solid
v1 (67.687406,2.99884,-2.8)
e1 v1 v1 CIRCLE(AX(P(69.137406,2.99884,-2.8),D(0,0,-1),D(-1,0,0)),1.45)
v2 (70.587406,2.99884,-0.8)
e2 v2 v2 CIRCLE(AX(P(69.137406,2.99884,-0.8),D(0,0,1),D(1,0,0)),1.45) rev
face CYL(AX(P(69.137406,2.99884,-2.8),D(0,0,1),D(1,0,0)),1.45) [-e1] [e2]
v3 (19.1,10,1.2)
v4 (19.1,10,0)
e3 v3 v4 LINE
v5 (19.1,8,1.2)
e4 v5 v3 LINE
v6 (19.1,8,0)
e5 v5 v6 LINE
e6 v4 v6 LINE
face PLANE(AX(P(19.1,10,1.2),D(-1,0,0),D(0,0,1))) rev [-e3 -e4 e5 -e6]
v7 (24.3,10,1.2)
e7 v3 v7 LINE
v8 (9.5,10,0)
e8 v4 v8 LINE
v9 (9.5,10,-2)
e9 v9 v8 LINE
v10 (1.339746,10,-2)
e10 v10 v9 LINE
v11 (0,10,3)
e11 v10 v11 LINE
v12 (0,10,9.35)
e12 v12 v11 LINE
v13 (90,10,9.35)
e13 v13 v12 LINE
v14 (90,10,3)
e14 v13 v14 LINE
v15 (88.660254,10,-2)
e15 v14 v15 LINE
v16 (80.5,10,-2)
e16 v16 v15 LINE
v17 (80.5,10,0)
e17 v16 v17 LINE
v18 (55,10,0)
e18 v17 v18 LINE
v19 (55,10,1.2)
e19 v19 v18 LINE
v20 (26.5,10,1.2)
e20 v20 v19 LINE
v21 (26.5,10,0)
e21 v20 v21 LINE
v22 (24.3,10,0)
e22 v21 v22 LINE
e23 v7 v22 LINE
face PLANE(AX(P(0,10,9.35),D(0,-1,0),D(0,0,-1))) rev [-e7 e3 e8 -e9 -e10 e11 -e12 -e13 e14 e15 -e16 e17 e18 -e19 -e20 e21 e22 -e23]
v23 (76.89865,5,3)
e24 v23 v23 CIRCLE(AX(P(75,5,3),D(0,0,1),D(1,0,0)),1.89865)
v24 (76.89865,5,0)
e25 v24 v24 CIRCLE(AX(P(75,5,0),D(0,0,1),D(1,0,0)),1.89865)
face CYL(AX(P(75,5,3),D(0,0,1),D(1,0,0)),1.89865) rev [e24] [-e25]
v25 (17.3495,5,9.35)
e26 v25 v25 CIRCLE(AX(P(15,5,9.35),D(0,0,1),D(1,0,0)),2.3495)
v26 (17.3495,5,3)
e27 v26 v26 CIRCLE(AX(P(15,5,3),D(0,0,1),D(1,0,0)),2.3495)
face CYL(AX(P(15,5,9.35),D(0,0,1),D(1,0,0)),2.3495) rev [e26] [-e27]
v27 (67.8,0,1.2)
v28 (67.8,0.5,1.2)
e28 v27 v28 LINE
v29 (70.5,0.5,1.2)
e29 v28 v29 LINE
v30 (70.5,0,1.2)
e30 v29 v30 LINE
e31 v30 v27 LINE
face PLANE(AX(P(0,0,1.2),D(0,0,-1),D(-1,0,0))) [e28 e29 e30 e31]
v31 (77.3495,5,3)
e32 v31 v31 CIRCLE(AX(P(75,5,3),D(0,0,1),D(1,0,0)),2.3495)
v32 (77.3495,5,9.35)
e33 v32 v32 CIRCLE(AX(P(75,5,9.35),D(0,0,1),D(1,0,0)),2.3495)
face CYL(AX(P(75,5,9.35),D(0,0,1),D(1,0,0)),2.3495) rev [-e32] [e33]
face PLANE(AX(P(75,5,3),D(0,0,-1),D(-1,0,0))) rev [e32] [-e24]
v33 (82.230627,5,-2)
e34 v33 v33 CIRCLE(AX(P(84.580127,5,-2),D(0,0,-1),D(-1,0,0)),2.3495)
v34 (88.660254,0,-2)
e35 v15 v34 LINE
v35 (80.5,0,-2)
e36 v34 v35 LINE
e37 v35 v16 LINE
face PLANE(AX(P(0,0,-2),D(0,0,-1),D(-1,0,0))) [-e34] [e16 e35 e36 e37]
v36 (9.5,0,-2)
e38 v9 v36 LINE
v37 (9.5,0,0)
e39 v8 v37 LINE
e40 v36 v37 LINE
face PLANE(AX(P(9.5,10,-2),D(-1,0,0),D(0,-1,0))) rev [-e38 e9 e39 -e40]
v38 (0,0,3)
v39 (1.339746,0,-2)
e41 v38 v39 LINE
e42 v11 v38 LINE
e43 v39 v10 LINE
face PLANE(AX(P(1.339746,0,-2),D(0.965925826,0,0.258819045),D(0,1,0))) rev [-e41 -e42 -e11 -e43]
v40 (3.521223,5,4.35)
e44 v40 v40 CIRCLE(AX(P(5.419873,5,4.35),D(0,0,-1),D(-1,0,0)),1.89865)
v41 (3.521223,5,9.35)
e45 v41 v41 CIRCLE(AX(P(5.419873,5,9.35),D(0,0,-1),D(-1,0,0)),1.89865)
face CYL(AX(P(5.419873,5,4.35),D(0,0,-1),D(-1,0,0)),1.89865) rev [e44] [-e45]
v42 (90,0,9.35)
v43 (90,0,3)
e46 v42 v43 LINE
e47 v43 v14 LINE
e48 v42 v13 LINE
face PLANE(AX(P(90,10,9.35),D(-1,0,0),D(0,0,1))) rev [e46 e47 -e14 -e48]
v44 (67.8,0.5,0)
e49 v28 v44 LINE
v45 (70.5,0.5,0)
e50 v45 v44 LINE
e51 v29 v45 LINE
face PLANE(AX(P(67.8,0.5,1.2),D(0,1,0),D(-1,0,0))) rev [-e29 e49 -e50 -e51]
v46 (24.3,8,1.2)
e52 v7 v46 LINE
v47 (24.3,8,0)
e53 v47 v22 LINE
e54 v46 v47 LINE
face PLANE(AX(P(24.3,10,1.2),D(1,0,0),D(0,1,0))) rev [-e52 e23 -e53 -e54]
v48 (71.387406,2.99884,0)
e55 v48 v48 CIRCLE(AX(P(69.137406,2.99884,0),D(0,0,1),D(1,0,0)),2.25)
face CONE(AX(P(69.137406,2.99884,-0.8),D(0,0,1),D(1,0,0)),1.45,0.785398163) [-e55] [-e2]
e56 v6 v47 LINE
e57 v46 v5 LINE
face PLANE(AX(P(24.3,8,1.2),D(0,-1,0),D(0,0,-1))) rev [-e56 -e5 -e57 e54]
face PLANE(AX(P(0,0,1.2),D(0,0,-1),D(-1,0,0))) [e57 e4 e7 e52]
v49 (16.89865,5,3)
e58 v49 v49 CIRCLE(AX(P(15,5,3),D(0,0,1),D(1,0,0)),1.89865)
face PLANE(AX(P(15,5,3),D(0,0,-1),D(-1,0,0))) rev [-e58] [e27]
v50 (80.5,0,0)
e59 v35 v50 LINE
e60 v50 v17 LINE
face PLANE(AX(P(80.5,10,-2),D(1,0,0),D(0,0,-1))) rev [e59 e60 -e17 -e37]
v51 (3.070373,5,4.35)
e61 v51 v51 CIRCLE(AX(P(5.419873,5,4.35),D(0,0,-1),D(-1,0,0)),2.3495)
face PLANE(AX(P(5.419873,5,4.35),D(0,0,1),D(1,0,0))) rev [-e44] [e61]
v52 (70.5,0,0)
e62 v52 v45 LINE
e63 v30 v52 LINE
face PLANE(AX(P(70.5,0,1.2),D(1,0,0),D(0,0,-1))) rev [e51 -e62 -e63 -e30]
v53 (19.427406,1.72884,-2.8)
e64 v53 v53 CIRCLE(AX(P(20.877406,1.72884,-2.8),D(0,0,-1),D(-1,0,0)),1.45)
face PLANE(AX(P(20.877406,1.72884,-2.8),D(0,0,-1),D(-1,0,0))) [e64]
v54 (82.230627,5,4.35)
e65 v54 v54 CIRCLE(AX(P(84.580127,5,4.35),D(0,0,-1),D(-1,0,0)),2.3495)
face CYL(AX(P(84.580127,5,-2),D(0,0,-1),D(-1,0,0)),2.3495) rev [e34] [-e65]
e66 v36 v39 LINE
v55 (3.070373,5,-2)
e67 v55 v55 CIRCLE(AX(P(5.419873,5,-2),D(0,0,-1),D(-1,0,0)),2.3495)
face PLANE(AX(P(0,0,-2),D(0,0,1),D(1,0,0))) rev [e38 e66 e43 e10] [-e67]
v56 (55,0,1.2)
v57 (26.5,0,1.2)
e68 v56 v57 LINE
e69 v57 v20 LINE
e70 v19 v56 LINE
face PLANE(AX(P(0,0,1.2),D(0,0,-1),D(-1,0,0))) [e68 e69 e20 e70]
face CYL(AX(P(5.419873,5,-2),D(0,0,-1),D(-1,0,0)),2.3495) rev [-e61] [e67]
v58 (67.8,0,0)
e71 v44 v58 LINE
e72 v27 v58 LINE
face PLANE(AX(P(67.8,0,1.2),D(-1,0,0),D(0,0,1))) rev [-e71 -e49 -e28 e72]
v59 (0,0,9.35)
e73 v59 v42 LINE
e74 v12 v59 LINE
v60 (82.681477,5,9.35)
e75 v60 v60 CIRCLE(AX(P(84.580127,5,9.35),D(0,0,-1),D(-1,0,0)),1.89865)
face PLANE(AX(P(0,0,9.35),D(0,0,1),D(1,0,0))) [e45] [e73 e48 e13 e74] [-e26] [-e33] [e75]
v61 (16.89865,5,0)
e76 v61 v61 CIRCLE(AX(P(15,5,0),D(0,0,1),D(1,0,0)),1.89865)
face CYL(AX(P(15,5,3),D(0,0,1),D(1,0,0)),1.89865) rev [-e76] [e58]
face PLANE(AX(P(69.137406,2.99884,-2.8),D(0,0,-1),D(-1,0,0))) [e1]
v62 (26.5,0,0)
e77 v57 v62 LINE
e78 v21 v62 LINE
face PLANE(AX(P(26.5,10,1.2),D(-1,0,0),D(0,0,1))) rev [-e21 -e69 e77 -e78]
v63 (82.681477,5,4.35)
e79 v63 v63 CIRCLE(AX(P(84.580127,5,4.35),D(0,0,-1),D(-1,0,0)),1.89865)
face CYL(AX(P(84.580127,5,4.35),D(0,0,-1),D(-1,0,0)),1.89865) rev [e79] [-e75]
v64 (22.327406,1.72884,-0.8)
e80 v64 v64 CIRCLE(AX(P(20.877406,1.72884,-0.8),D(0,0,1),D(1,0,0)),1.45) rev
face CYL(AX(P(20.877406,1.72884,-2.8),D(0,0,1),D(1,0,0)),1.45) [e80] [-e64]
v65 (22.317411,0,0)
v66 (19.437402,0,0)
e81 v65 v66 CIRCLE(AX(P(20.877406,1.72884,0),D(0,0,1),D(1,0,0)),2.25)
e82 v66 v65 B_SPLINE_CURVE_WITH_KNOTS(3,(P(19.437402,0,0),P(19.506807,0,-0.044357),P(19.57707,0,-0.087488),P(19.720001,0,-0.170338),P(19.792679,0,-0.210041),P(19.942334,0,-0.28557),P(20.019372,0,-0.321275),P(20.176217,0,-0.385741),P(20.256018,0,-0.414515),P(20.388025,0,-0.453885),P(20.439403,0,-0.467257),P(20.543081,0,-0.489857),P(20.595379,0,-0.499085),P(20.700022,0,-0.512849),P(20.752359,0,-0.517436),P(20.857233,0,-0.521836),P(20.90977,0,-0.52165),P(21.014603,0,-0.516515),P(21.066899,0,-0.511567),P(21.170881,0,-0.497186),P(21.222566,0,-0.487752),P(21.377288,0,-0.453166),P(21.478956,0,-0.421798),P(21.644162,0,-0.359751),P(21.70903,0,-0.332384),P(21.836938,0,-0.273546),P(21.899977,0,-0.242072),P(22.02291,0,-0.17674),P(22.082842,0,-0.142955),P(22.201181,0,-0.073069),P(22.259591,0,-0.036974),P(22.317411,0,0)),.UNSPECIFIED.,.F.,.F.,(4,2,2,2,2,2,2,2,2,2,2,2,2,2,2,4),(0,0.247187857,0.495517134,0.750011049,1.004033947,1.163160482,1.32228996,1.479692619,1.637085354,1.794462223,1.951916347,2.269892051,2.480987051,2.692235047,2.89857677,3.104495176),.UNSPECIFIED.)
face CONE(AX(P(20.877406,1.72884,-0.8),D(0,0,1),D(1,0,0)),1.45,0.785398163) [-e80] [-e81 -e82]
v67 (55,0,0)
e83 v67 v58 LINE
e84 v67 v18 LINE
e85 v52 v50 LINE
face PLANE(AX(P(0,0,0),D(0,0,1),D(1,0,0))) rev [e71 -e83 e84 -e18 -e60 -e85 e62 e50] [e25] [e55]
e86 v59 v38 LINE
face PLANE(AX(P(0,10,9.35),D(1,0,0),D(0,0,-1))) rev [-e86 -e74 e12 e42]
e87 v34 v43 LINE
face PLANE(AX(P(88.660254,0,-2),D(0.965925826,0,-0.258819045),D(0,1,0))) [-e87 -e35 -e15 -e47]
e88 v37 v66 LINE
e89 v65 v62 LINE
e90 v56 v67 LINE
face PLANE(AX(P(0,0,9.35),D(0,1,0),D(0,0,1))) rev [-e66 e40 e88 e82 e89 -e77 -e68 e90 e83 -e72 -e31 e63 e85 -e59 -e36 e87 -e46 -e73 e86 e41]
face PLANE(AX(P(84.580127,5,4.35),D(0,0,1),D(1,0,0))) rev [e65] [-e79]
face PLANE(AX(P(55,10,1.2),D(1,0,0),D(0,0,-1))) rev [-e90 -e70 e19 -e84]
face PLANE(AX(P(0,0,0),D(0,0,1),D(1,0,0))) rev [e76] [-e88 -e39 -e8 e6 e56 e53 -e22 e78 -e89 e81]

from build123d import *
from OCP.BRepFilletAPI import BRepFilletAPI_MakeChamfer

# Parameters (mm, degrees)
SKETCH2_W                       = 90
SKETCH2_H                       = 10
BOSS_EXTRUDE1_DEPTH             = 9.35
SKETCH4_W                       = 9.5
SKETCH4_H                       = 10
BOSS_EXTRUDE2_DEPTH             = 2
SKETCH5_R                       = 1.45
BOSS_EXTRUDE3_DEPTH             = 2.8
CHAMFER1_SIZE                   = 0.8
CHAMFER2_SIZE                   = 5
CHAMFER2_SIZE2                  = 1.339745962
F_13_0_185_DIAMETER_HOLE1_D     = 4.699
F_13_0_185_DIAMETER_HOLE1_DEPTH = 6.35
F_6_CLEARANCE_HOLE1_D           = 3.7973
F_6_CLEARANCE_HOLE1_ON_FACE_2_D = 3.7973
F_13_0_185_DIAMETER_HOLE2_D     = 4.699
F_13_0_185_DIAMETER_HOLE2_DEPTH = 6.35
F_6_CLEARANCE_HOLE2_D           = 3.7973
CUT_EXTRUDE1_DEPTH              = 92.035281622
CUT_EXTRUDE1_DEPTH_BACK         = 1.2
SKETCH12_W                      = 28.5
SKETCH12_H                      = 10
SKETCH12_W_2                    = 5.2
SKETCH12_H_2                    = 2
SKETCH12_W_3                    = 2.7
SKETCH12_H_3                    = 0.5


with BuildPart() as part:
    # Sketch2 → Boss-Extrude1 (new body)
    with BuildSketch(Plane.XY):
        with Locations((45, 5)):
            Rectangle(SKETCH2_W, SKETCH2_H)
    extrude(amount=BOSS_EXTRUDE1_DEPTH)

    # Sketch4 → Boss-Extrude2 (add)
    with BuildSketch(Plane(origin=(0, 0, 0), x_dir=(-1, 0, 0), z_dir=(0, 0, -1))):
        with Locations((-4.75, 5)):
            Rectangle(SKETCH4_W, SKETCH4_H)
        with Locations((-85.25, 5)):
            Rectangle(SKETCH4_W, SKETCH4_H)
    extrude(amount=BOSS_EXTRUDE2_DEPTH)

    # Sketch5 → Boss-Extrude3 (add)
    with BuildSketch(Plane(origin=(0, 0, 0), x_dir=(-1, 0, 0), z_dir=(0, 0, -1))):
        with Locations(Location((-69.137406388, 2.998839673, 0), (0, 0, 180))):
            Circle(SKETCH5_R)
        with Locations(Location((-20.877406388, 1.728839673, 0), (0, 0, 180))):
            Circle(SKETCH5_R)
    extrude(amount=BOSS_EXTRUDE3_DEPTH)

    # Chamfer1
    # the kernel refuses this chamfer: 0.8 mm, written as the material it adds along each edge
    with BuildSketch(Plane(origin=(69.137406388, 2.998839673, 0), x_dir=(1, 0, 0), z_dir=(0, 1, 0))) as chamfer1_piece_1:
        Polygon((1.45 + CHAMFER1_SIZE, 0), (1.45, CHAMFER1_SIZE), (1.45, 0), align=None)
    revolve(axis=Axis((69.137406388, 2.998839673, 0), (0, 0, -1)))
    with BuildSketch(Plane(origin=(20.877406388, 1.728839673, 0), x_dir=(1, 0, 0), z_dir=(0, 1, 0))) as chamfer1_piece_2_section:
        Polygon((1.45 + CHAMFER1_SIZE, 0), (1.45, CHAMFER1_SIZE), (1.45, 0), align=None)
    chamfer1_piece_2 = revolve(axis=Axis((20.877406388, 1.728839673, 0), (0, 0, -1)), mode=Mode.PRIVATE)
    chamfer1_piece_2 = split(chamfer1_piece_2, bisect_by=Plane(origin=(19.038199604, 0, -0.389206784), z_dir=(0, 1, 0)), keep=Keep.TOP, mode=Mode.PRIVATE)
    add(chamfer1_piece_2)

    # Chamfer2: one chamfer whose edges measure the first distance from different faces: ONE call of the kernel's chamfer builder (chamfer() names one face for all edges)
    chamfer2_edges_1 = [part.edges().sort_by_distance(p)[0] for p in [
        (0, 5, -2),
    ]]
    chamfer2_side_1 = [part.faces().sort_by_distance(p)[0] for p in [
        (0, 5, 3.675),
    ]]
    chamfer2_edges_2 = [part.edges().sort_by_distance(p)[0] for p in [
        (90, 5, -2),
    ]]
    chamfer2_side_2 = [part.faces().sort_by_distance(p)[0] for p in [
        (90, 5, 3.675),
    ]]
    chamfer2 = BRepFilletAPI_MakeChamfer(part.part.solid().wrapped)
    for e in chamfer2_edges_1:
        chamfer2.Add(CHAMFER2_SIZE, CHAMFER2_SIZE2, e.wrapped, chamfer2_side_1[0].wrapped)  # the first distance lies on this face
    for e in chamfer2_edges_2:
        chamfer2.Add(CHAMFER2_SIZE, CHAMFER2_SIZE2, e.wrapped, chamfer2_side_2[0].wrapped)  # the first distance lies on this face
    add(Compound.cast(chamfer2.Shape()), mode=Mode.REPLACE)

    # #13 (0.185) Diameter Hole1
    with Locations(Plane(origin=(84.580127019, 5, -2), x_dir=(-1, 0, 0), z_dir=(0, 0, -1))):
        with Locations((0, 0), (79.160254038, 0)):
            Hole(F_13_0_185_DIAMETER_HOLE1_D / 2, depth=F_13_0_185_DIAMETER_HOLE1_DEPTH)

    # #6 Clearance Hole1 (through all)
    with Locations(Plane(origin=(84.580127019, 5, 4.35), x_dir=(-1, 0, 0), z_dir=(0, 0, -1))):
        with Locations((0, 0), (79.160254038, 0)):
            Hole(F_6_CLEARANCE_HOLE1_D / 2)

    # #6 Clearance Hole1 on face 2 (through all)
    with Locations(Plane(origin=(5.419872981, 5, 0), x_dir=(-1, 0, 0), z_dir=(0, 0, -1))):
        with Locations((0, 0)):
            Hole(F_6_CLEARANCE_HOLE1_ON_FACE_2_D / 2)

    # #13 (0.185) Diameter Hole2
    with Locations(Plane(origin=(75, 5, 9.35), x_dir=(1, 0, 0), z_dir=(0, 0, 1))):
        with Locations((0, 0), (-60, 0)):
            Hole(F_13_0_185_DIAMETER_HOLE2_D / 2, depth=F_13_0_185_DIAMETER_HOLE2_DEPTH)

    # #6 Clearance Hole2 (through all)
    with Locations(Plane(origin=(75, 5, 3), x_dir=(1, 0, 0), z_dir=(0, 0, 1))):
        with Locations((0, 0), (-60, 0)):
            Hole(F_6_CLEARANCE_HOLE2_D / 2)

    # Sketch12 → Cut-Extrude1 (cut, two sides: drawn at the far end of the back side and taken through both)
    with BuildSketch(Plane(origin=(0, 0, 0), x_dir=(-1, 0, 0), z_dir=(0, 0, -1)).offset(-CUT_EXTRUDE1_DEPTH_BACK)):
        with Locations((-40.75, 5)):
            Rectangle(SKETCH12_W, SKETCH12_H)
        with Locations((-21.7, 9)):
            Rectangle(SKETCH12_W_2, SKETCH12_H_2)
        with Locations((-69.15, 0.25)):
            Rectangle(SKETCH12_W_3, SKETCH12_H_3)
    extrude(amount=CUT_EXTRUDE1_DEPTH + CUT_EXTRUDE1_DEPTH_BACK, mode=Mode.SUBTRACT)


solid = part.part
